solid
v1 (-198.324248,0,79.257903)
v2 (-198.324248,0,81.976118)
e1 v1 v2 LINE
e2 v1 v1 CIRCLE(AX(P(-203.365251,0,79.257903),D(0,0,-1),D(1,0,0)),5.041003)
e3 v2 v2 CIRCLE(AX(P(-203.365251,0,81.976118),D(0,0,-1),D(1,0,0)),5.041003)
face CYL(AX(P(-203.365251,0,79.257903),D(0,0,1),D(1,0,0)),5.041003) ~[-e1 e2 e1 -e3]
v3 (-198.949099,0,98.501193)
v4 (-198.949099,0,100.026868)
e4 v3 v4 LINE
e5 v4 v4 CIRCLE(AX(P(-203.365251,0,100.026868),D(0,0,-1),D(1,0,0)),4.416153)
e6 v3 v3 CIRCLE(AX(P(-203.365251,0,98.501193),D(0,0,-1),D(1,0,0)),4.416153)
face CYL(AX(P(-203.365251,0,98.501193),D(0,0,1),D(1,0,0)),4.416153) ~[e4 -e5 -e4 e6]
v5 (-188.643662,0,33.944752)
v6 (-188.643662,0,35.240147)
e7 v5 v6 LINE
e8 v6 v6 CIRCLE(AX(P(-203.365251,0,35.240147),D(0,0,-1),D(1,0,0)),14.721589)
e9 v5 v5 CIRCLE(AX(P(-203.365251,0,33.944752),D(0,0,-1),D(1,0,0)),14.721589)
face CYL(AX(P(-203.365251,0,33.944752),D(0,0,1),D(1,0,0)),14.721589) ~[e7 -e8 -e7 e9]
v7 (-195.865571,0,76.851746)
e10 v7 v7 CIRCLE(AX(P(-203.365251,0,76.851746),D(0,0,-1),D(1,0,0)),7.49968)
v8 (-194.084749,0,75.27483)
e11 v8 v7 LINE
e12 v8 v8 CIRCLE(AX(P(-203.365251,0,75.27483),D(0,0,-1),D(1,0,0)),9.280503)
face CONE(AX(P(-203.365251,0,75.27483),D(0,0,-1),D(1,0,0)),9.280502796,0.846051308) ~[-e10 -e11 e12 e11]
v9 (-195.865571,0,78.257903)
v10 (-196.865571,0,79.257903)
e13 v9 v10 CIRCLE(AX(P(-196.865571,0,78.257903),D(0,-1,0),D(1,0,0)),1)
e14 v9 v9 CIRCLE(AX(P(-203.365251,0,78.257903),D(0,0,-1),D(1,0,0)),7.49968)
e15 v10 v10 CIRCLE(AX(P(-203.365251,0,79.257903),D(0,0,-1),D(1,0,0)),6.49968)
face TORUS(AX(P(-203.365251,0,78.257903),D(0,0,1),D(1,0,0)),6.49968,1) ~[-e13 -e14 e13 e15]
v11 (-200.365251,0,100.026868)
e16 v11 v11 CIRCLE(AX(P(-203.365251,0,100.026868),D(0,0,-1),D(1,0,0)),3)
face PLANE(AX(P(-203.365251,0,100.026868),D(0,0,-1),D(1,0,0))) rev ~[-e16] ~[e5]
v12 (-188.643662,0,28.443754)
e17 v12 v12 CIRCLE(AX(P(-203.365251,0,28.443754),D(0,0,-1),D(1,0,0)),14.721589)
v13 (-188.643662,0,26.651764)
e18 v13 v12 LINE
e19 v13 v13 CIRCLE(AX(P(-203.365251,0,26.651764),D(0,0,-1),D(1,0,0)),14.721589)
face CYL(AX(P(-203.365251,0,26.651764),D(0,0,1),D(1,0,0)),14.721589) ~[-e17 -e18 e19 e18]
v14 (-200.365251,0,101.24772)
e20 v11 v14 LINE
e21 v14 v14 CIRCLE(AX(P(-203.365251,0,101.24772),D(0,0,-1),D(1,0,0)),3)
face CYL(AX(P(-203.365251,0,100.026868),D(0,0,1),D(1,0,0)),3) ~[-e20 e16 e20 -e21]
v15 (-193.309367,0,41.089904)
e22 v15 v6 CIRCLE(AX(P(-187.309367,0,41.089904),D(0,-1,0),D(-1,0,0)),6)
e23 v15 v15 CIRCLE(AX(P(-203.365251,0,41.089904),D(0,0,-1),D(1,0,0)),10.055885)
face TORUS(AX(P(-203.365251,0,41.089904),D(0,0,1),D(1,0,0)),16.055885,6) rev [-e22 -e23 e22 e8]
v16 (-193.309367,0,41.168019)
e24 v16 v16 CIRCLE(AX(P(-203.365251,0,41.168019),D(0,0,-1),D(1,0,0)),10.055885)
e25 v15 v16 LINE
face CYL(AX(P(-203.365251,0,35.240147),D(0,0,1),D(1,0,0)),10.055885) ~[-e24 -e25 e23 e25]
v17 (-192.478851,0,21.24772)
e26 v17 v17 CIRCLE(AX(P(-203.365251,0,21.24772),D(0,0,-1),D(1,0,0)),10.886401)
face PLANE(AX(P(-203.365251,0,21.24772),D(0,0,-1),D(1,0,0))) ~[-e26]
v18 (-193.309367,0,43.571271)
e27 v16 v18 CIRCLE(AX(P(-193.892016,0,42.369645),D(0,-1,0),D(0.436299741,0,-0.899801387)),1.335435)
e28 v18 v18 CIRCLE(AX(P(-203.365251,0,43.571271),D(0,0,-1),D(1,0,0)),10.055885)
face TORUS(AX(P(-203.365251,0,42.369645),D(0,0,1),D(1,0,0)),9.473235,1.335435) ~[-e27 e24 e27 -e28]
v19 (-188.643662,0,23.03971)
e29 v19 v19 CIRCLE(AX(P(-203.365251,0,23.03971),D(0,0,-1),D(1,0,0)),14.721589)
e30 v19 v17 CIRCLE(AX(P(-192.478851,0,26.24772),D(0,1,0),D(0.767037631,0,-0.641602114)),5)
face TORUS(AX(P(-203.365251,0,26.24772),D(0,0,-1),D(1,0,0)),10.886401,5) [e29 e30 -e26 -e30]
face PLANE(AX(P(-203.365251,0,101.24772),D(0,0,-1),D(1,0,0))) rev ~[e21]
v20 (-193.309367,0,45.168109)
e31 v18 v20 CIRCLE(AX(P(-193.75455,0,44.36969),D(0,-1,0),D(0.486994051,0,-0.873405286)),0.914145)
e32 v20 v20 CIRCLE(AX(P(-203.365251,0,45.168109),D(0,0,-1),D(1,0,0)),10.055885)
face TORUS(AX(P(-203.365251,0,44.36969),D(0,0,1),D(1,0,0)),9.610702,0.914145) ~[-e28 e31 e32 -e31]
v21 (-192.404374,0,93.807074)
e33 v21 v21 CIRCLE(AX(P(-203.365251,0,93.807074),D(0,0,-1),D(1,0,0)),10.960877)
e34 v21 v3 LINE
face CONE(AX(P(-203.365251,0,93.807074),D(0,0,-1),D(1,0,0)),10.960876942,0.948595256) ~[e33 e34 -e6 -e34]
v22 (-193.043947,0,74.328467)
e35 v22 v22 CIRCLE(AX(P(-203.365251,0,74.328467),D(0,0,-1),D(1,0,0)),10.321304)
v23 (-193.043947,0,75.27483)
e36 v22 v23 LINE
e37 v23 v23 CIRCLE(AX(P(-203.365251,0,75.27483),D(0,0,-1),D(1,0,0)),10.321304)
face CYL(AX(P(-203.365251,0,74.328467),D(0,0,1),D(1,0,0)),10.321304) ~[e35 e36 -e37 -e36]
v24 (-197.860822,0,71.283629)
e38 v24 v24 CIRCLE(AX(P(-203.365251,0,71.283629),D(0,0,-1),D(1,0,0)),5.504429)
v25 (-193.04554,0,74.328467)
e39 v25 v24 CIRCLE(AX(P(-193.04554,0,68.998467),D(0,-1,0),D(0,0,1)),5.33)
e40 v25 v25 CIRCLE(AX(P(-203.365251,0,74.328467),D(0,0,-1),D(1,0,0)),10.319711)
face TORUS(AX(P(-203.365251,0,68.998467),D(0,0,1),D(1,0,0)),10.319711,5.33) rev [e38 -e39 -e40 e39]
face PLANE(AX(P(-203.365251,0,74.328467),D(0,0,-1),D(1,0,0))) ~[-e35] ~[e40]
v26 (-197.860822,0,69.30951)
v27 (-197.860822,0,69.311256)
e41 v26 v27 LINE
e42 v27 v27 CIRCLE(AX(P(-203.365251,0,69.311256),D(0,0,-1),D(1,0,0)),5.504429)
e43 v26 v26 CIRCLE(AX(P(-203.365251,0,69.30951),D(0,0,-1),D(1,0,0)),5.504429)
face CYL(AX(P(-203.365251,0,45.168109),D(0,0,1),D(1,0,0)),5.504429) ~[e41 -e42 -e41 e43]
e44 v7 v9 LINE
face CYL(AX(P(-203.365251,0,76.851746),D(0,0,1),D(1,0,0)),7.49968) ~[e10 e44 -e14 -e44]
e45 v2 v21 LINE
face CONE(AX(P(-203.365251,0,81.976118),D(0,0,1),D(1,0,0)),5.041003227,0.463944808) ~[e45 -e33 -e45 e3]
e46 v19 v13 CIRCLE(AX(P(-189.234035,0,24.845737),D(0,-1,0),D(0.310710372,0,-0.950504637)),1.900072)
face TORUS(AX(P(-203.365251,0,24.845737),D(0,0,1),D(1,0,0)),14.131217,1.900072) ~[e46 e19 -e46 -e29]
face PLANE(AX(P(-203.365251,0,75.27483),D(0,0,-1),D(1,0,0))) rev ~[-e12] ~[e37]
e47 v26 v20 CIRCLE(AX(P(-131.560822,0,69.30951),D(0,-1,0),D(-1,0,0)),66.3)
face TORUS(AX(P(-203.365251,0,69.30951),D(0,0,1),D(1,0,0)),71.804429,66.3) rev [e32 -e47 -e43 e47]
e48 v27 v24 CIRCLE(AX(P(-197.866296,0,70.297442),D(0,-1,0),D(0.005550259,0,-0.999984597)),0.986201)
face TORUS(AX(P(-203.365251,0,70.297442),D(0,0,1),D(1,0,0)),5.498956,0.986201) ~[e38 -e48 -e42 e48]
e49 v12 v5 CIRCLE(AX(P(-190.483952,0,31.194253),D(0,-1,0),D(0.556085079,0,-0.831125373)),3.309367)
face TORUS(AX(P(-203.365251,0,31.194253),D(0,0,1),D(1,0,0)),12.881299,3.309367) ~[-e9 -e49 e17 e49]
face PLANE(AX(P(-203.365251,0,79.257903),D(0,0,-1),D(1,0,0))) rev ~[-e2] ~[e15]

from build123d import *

# Parameters (mm, degrees)
F6_R = 1


# Not quite as in the source:
# - a fillet or chamfer that OpenCascade refuses, or shapes differently, is made with other operations: its cross-section is extruded or revolved along the edge and cut away or added


with BuildPart() as f1:
    # F0 (on Front) → F1 (revolve)
    with BuildSketch(Plane.XZ):
        with BuildLine():
            Line((-200.3652514219, 101.2477203459), (-203.3652514219, 101.2477203459))
            Line((-203.3652514219, 101.2477203459), (-203.3652514219, 21.2477203459))
            Line((-203.3652514219, 21.2477203459), (-188.6436624619, 21.2477203459))
            Line((-188.6436624619, 21.2477203459), (-188.6436624619, 23.0397097766))
            ThreePointArc((-188.6436624619, 23.0397097766), (-187.333962533, 24.8457370326), (-188.6436624619, 26.6517642885))
            Line((-188.6436624619, 26.6517642885), (-188.6436624619, 28.4437537193))
            ThreePointArc((-188.6436624619, 28.4437537193), (-187.1745849151, 31.1942528933), (-188.6436624619, 33.9447520673))
            Line((-188.6436624619, 33.9447520673), (-188.6436624619, 35.2401472628))
            Line((-188.6436624619, 35.2401472628), (-193.309366703, 35.2401472628))
            Line((-193.309366703, 35.2401472628), (-193.309366703, 41.1680191755))
            ThreePointArc((-193.309366703, 41.1680191755), (-192.5565818681, 42.3696450889), (-193.309366703, 43.5712710023))
            ThreePointArc((-193.309366703, 43.5712710023), (-192.8404048548, 44.3696901202), (-193.309366703, 45.1681092381))
            Line((-193.309366703, 45.1681092381), (-197.8608220816, 45.1681092381))
            Line((-197.8608220816, 45.1681092381), (-197.8608220816, 69.3112561437))
            ThreePointArc((-197.8608220816, 69.3112561437), (-196.8800943317, 70.2974423766), (-197.8608220816, 71.2836286096))
            Line((-197.8608220816, 71.2836286096), (-197.8608220816, 74.3284672499))
            Line((-197.8608220816, 74.3284672499), (-193.0439472198, 74.3284672499))
            Line((-193.0439472198, 74.3284672499), (-193.0439472198, 75.2748303938))
            Line((-193.0439472198, 75.2748303938), (-194.0847486258, 75.2748303938))
            Line((-194.0847486258, 75.2748303938), (-195.8655714989, 76.8517457771))
            Line((-195.8655714989, 76.8517457771), (-195.8655714989, 79.2579033303))
            Line((-195.8655714989, 79.2579033303), (-198.3242481947, 79.2579033303))
            Line((-198.3242481947, 79.2579033303), (-198.3242481947, 80.6170105934))
            Line((-198.3242481947, 80.6170105934), (-198.3242481947, 81.9761178565))
            Line((-198.3242481947, 81.9761178565), (-192.4043744802, 93.8070736003))
            Line((-192.4043744802, 93.8070736003), (-198.949098587, 98.5011926961))
            Line((-198.949098587, 98.5011926961), (-198.949098587, 100.0268682092))
            Line((-198.949098587, 100.0268682092), (-200.3652514219, 100.0268682092))
            Line((-200.3652514219, 100.0268682092), (-200.3652514219, 101.2477203459))
        make_face()
    revolve(axis=Axis((-203.3652514219, 0, 61.2477203459), (0, 0, -1)))

    # F2: fillet of radius 5 on 1 edges, made by hand

    # F2_s1 → F2_t2 (revolve, cut)
    with BuildSketch(Plane.XZ):
        with BuildLine():
            ThreePointArc((-188.6436624619, 23.0397097766), (-190.3622558104, 21.7178167682), (-192.4788506174, 21.2477203459))
            Line((-192.4788506174, 21.2477203459), (-188.6436624619, 21.2477203459))
            Line((-188.6436624619, 21.2477203459), (-188.6436624619, 23.0397097766))
        make_face()
    revolve(axis=Axis((-203.3652514219, 0, 21.2477203459), (0, 0, -1)), mode=Mode.SUBTRACT)

    # F3: fillet of radius 6 on 1 edges, made by hand

    # F3_s1 → F3_t2 (revolve)
    with BuildSketch(Plane.XZ):
        with BuildLine():
            ThreePointArc((-193.309366703, 41.0899040806), (-192.0000902375, 37.3486325423), (-188.6436624619, 35.2401472628))
            Line((-188.6436624619, 35.2401472628), (-193.309366703, 35.2401472628))
            Line((-193.309366703, 35.2401472628), (-193.309366703, 41.0899040806))
        make_face()
    revolve(axis=Axis((-203.3652514219, 0, 35.2401472628), (0, 0, -1)))

    # F4: fillet of radius 66.3 on 1 edges, made by hand

    # F4_s1 → F4_t2 (revolve)
    with BuildSketch(Plane.XZ):
        with BuildLine():
            ThreePointArc((-197.8608220816, 69.3095101323), (-196.7130227674, 57.0261577479), (-193.309366703, 45.1681092381))
            Line((-193.309366703, 45.1681092381), (-197.8608220816, 45.1681092381))
            Line((-197.8608220816, 45.1681092381), (-197.8608220816, 69.3095101323))
        make_face()
    revolve(axis=Axis((-203.3652514219, 0, 45.1681092381), (0, 0, -1)))

    # F5: fillet of radius 5.33 on 1 edges, made by hand

    # F5_s1 → F5_t2 (revolve)
    with BuildSketch(Plane.XZ):
        with BuildLine():
            ThreePointArc((-193.0455404117, 74.3284672499), (-195.8941356754, 73.5033984395), (-197.8608220816, 71.2836286096))
            Line((-197.8608220816, 71.2836286096), (-197.8608220816, 74.3284672499))
            Line((-197.8608220816, 74.3284672499), (-193.0455404117, 74.3284672499))
        make_face()
    revolve(axis=Axis((-203.3652514219, 0, 74.3284672499), (0, 0, -1)))

    # F6
    f6_edges = [f1.edges().sort_by_distance(p)[0] for p in [
        (-210.864931, 0, 79.257903),
    ]]
    fillet(f6_edges, radius=F6_R)


solid = f1.part
